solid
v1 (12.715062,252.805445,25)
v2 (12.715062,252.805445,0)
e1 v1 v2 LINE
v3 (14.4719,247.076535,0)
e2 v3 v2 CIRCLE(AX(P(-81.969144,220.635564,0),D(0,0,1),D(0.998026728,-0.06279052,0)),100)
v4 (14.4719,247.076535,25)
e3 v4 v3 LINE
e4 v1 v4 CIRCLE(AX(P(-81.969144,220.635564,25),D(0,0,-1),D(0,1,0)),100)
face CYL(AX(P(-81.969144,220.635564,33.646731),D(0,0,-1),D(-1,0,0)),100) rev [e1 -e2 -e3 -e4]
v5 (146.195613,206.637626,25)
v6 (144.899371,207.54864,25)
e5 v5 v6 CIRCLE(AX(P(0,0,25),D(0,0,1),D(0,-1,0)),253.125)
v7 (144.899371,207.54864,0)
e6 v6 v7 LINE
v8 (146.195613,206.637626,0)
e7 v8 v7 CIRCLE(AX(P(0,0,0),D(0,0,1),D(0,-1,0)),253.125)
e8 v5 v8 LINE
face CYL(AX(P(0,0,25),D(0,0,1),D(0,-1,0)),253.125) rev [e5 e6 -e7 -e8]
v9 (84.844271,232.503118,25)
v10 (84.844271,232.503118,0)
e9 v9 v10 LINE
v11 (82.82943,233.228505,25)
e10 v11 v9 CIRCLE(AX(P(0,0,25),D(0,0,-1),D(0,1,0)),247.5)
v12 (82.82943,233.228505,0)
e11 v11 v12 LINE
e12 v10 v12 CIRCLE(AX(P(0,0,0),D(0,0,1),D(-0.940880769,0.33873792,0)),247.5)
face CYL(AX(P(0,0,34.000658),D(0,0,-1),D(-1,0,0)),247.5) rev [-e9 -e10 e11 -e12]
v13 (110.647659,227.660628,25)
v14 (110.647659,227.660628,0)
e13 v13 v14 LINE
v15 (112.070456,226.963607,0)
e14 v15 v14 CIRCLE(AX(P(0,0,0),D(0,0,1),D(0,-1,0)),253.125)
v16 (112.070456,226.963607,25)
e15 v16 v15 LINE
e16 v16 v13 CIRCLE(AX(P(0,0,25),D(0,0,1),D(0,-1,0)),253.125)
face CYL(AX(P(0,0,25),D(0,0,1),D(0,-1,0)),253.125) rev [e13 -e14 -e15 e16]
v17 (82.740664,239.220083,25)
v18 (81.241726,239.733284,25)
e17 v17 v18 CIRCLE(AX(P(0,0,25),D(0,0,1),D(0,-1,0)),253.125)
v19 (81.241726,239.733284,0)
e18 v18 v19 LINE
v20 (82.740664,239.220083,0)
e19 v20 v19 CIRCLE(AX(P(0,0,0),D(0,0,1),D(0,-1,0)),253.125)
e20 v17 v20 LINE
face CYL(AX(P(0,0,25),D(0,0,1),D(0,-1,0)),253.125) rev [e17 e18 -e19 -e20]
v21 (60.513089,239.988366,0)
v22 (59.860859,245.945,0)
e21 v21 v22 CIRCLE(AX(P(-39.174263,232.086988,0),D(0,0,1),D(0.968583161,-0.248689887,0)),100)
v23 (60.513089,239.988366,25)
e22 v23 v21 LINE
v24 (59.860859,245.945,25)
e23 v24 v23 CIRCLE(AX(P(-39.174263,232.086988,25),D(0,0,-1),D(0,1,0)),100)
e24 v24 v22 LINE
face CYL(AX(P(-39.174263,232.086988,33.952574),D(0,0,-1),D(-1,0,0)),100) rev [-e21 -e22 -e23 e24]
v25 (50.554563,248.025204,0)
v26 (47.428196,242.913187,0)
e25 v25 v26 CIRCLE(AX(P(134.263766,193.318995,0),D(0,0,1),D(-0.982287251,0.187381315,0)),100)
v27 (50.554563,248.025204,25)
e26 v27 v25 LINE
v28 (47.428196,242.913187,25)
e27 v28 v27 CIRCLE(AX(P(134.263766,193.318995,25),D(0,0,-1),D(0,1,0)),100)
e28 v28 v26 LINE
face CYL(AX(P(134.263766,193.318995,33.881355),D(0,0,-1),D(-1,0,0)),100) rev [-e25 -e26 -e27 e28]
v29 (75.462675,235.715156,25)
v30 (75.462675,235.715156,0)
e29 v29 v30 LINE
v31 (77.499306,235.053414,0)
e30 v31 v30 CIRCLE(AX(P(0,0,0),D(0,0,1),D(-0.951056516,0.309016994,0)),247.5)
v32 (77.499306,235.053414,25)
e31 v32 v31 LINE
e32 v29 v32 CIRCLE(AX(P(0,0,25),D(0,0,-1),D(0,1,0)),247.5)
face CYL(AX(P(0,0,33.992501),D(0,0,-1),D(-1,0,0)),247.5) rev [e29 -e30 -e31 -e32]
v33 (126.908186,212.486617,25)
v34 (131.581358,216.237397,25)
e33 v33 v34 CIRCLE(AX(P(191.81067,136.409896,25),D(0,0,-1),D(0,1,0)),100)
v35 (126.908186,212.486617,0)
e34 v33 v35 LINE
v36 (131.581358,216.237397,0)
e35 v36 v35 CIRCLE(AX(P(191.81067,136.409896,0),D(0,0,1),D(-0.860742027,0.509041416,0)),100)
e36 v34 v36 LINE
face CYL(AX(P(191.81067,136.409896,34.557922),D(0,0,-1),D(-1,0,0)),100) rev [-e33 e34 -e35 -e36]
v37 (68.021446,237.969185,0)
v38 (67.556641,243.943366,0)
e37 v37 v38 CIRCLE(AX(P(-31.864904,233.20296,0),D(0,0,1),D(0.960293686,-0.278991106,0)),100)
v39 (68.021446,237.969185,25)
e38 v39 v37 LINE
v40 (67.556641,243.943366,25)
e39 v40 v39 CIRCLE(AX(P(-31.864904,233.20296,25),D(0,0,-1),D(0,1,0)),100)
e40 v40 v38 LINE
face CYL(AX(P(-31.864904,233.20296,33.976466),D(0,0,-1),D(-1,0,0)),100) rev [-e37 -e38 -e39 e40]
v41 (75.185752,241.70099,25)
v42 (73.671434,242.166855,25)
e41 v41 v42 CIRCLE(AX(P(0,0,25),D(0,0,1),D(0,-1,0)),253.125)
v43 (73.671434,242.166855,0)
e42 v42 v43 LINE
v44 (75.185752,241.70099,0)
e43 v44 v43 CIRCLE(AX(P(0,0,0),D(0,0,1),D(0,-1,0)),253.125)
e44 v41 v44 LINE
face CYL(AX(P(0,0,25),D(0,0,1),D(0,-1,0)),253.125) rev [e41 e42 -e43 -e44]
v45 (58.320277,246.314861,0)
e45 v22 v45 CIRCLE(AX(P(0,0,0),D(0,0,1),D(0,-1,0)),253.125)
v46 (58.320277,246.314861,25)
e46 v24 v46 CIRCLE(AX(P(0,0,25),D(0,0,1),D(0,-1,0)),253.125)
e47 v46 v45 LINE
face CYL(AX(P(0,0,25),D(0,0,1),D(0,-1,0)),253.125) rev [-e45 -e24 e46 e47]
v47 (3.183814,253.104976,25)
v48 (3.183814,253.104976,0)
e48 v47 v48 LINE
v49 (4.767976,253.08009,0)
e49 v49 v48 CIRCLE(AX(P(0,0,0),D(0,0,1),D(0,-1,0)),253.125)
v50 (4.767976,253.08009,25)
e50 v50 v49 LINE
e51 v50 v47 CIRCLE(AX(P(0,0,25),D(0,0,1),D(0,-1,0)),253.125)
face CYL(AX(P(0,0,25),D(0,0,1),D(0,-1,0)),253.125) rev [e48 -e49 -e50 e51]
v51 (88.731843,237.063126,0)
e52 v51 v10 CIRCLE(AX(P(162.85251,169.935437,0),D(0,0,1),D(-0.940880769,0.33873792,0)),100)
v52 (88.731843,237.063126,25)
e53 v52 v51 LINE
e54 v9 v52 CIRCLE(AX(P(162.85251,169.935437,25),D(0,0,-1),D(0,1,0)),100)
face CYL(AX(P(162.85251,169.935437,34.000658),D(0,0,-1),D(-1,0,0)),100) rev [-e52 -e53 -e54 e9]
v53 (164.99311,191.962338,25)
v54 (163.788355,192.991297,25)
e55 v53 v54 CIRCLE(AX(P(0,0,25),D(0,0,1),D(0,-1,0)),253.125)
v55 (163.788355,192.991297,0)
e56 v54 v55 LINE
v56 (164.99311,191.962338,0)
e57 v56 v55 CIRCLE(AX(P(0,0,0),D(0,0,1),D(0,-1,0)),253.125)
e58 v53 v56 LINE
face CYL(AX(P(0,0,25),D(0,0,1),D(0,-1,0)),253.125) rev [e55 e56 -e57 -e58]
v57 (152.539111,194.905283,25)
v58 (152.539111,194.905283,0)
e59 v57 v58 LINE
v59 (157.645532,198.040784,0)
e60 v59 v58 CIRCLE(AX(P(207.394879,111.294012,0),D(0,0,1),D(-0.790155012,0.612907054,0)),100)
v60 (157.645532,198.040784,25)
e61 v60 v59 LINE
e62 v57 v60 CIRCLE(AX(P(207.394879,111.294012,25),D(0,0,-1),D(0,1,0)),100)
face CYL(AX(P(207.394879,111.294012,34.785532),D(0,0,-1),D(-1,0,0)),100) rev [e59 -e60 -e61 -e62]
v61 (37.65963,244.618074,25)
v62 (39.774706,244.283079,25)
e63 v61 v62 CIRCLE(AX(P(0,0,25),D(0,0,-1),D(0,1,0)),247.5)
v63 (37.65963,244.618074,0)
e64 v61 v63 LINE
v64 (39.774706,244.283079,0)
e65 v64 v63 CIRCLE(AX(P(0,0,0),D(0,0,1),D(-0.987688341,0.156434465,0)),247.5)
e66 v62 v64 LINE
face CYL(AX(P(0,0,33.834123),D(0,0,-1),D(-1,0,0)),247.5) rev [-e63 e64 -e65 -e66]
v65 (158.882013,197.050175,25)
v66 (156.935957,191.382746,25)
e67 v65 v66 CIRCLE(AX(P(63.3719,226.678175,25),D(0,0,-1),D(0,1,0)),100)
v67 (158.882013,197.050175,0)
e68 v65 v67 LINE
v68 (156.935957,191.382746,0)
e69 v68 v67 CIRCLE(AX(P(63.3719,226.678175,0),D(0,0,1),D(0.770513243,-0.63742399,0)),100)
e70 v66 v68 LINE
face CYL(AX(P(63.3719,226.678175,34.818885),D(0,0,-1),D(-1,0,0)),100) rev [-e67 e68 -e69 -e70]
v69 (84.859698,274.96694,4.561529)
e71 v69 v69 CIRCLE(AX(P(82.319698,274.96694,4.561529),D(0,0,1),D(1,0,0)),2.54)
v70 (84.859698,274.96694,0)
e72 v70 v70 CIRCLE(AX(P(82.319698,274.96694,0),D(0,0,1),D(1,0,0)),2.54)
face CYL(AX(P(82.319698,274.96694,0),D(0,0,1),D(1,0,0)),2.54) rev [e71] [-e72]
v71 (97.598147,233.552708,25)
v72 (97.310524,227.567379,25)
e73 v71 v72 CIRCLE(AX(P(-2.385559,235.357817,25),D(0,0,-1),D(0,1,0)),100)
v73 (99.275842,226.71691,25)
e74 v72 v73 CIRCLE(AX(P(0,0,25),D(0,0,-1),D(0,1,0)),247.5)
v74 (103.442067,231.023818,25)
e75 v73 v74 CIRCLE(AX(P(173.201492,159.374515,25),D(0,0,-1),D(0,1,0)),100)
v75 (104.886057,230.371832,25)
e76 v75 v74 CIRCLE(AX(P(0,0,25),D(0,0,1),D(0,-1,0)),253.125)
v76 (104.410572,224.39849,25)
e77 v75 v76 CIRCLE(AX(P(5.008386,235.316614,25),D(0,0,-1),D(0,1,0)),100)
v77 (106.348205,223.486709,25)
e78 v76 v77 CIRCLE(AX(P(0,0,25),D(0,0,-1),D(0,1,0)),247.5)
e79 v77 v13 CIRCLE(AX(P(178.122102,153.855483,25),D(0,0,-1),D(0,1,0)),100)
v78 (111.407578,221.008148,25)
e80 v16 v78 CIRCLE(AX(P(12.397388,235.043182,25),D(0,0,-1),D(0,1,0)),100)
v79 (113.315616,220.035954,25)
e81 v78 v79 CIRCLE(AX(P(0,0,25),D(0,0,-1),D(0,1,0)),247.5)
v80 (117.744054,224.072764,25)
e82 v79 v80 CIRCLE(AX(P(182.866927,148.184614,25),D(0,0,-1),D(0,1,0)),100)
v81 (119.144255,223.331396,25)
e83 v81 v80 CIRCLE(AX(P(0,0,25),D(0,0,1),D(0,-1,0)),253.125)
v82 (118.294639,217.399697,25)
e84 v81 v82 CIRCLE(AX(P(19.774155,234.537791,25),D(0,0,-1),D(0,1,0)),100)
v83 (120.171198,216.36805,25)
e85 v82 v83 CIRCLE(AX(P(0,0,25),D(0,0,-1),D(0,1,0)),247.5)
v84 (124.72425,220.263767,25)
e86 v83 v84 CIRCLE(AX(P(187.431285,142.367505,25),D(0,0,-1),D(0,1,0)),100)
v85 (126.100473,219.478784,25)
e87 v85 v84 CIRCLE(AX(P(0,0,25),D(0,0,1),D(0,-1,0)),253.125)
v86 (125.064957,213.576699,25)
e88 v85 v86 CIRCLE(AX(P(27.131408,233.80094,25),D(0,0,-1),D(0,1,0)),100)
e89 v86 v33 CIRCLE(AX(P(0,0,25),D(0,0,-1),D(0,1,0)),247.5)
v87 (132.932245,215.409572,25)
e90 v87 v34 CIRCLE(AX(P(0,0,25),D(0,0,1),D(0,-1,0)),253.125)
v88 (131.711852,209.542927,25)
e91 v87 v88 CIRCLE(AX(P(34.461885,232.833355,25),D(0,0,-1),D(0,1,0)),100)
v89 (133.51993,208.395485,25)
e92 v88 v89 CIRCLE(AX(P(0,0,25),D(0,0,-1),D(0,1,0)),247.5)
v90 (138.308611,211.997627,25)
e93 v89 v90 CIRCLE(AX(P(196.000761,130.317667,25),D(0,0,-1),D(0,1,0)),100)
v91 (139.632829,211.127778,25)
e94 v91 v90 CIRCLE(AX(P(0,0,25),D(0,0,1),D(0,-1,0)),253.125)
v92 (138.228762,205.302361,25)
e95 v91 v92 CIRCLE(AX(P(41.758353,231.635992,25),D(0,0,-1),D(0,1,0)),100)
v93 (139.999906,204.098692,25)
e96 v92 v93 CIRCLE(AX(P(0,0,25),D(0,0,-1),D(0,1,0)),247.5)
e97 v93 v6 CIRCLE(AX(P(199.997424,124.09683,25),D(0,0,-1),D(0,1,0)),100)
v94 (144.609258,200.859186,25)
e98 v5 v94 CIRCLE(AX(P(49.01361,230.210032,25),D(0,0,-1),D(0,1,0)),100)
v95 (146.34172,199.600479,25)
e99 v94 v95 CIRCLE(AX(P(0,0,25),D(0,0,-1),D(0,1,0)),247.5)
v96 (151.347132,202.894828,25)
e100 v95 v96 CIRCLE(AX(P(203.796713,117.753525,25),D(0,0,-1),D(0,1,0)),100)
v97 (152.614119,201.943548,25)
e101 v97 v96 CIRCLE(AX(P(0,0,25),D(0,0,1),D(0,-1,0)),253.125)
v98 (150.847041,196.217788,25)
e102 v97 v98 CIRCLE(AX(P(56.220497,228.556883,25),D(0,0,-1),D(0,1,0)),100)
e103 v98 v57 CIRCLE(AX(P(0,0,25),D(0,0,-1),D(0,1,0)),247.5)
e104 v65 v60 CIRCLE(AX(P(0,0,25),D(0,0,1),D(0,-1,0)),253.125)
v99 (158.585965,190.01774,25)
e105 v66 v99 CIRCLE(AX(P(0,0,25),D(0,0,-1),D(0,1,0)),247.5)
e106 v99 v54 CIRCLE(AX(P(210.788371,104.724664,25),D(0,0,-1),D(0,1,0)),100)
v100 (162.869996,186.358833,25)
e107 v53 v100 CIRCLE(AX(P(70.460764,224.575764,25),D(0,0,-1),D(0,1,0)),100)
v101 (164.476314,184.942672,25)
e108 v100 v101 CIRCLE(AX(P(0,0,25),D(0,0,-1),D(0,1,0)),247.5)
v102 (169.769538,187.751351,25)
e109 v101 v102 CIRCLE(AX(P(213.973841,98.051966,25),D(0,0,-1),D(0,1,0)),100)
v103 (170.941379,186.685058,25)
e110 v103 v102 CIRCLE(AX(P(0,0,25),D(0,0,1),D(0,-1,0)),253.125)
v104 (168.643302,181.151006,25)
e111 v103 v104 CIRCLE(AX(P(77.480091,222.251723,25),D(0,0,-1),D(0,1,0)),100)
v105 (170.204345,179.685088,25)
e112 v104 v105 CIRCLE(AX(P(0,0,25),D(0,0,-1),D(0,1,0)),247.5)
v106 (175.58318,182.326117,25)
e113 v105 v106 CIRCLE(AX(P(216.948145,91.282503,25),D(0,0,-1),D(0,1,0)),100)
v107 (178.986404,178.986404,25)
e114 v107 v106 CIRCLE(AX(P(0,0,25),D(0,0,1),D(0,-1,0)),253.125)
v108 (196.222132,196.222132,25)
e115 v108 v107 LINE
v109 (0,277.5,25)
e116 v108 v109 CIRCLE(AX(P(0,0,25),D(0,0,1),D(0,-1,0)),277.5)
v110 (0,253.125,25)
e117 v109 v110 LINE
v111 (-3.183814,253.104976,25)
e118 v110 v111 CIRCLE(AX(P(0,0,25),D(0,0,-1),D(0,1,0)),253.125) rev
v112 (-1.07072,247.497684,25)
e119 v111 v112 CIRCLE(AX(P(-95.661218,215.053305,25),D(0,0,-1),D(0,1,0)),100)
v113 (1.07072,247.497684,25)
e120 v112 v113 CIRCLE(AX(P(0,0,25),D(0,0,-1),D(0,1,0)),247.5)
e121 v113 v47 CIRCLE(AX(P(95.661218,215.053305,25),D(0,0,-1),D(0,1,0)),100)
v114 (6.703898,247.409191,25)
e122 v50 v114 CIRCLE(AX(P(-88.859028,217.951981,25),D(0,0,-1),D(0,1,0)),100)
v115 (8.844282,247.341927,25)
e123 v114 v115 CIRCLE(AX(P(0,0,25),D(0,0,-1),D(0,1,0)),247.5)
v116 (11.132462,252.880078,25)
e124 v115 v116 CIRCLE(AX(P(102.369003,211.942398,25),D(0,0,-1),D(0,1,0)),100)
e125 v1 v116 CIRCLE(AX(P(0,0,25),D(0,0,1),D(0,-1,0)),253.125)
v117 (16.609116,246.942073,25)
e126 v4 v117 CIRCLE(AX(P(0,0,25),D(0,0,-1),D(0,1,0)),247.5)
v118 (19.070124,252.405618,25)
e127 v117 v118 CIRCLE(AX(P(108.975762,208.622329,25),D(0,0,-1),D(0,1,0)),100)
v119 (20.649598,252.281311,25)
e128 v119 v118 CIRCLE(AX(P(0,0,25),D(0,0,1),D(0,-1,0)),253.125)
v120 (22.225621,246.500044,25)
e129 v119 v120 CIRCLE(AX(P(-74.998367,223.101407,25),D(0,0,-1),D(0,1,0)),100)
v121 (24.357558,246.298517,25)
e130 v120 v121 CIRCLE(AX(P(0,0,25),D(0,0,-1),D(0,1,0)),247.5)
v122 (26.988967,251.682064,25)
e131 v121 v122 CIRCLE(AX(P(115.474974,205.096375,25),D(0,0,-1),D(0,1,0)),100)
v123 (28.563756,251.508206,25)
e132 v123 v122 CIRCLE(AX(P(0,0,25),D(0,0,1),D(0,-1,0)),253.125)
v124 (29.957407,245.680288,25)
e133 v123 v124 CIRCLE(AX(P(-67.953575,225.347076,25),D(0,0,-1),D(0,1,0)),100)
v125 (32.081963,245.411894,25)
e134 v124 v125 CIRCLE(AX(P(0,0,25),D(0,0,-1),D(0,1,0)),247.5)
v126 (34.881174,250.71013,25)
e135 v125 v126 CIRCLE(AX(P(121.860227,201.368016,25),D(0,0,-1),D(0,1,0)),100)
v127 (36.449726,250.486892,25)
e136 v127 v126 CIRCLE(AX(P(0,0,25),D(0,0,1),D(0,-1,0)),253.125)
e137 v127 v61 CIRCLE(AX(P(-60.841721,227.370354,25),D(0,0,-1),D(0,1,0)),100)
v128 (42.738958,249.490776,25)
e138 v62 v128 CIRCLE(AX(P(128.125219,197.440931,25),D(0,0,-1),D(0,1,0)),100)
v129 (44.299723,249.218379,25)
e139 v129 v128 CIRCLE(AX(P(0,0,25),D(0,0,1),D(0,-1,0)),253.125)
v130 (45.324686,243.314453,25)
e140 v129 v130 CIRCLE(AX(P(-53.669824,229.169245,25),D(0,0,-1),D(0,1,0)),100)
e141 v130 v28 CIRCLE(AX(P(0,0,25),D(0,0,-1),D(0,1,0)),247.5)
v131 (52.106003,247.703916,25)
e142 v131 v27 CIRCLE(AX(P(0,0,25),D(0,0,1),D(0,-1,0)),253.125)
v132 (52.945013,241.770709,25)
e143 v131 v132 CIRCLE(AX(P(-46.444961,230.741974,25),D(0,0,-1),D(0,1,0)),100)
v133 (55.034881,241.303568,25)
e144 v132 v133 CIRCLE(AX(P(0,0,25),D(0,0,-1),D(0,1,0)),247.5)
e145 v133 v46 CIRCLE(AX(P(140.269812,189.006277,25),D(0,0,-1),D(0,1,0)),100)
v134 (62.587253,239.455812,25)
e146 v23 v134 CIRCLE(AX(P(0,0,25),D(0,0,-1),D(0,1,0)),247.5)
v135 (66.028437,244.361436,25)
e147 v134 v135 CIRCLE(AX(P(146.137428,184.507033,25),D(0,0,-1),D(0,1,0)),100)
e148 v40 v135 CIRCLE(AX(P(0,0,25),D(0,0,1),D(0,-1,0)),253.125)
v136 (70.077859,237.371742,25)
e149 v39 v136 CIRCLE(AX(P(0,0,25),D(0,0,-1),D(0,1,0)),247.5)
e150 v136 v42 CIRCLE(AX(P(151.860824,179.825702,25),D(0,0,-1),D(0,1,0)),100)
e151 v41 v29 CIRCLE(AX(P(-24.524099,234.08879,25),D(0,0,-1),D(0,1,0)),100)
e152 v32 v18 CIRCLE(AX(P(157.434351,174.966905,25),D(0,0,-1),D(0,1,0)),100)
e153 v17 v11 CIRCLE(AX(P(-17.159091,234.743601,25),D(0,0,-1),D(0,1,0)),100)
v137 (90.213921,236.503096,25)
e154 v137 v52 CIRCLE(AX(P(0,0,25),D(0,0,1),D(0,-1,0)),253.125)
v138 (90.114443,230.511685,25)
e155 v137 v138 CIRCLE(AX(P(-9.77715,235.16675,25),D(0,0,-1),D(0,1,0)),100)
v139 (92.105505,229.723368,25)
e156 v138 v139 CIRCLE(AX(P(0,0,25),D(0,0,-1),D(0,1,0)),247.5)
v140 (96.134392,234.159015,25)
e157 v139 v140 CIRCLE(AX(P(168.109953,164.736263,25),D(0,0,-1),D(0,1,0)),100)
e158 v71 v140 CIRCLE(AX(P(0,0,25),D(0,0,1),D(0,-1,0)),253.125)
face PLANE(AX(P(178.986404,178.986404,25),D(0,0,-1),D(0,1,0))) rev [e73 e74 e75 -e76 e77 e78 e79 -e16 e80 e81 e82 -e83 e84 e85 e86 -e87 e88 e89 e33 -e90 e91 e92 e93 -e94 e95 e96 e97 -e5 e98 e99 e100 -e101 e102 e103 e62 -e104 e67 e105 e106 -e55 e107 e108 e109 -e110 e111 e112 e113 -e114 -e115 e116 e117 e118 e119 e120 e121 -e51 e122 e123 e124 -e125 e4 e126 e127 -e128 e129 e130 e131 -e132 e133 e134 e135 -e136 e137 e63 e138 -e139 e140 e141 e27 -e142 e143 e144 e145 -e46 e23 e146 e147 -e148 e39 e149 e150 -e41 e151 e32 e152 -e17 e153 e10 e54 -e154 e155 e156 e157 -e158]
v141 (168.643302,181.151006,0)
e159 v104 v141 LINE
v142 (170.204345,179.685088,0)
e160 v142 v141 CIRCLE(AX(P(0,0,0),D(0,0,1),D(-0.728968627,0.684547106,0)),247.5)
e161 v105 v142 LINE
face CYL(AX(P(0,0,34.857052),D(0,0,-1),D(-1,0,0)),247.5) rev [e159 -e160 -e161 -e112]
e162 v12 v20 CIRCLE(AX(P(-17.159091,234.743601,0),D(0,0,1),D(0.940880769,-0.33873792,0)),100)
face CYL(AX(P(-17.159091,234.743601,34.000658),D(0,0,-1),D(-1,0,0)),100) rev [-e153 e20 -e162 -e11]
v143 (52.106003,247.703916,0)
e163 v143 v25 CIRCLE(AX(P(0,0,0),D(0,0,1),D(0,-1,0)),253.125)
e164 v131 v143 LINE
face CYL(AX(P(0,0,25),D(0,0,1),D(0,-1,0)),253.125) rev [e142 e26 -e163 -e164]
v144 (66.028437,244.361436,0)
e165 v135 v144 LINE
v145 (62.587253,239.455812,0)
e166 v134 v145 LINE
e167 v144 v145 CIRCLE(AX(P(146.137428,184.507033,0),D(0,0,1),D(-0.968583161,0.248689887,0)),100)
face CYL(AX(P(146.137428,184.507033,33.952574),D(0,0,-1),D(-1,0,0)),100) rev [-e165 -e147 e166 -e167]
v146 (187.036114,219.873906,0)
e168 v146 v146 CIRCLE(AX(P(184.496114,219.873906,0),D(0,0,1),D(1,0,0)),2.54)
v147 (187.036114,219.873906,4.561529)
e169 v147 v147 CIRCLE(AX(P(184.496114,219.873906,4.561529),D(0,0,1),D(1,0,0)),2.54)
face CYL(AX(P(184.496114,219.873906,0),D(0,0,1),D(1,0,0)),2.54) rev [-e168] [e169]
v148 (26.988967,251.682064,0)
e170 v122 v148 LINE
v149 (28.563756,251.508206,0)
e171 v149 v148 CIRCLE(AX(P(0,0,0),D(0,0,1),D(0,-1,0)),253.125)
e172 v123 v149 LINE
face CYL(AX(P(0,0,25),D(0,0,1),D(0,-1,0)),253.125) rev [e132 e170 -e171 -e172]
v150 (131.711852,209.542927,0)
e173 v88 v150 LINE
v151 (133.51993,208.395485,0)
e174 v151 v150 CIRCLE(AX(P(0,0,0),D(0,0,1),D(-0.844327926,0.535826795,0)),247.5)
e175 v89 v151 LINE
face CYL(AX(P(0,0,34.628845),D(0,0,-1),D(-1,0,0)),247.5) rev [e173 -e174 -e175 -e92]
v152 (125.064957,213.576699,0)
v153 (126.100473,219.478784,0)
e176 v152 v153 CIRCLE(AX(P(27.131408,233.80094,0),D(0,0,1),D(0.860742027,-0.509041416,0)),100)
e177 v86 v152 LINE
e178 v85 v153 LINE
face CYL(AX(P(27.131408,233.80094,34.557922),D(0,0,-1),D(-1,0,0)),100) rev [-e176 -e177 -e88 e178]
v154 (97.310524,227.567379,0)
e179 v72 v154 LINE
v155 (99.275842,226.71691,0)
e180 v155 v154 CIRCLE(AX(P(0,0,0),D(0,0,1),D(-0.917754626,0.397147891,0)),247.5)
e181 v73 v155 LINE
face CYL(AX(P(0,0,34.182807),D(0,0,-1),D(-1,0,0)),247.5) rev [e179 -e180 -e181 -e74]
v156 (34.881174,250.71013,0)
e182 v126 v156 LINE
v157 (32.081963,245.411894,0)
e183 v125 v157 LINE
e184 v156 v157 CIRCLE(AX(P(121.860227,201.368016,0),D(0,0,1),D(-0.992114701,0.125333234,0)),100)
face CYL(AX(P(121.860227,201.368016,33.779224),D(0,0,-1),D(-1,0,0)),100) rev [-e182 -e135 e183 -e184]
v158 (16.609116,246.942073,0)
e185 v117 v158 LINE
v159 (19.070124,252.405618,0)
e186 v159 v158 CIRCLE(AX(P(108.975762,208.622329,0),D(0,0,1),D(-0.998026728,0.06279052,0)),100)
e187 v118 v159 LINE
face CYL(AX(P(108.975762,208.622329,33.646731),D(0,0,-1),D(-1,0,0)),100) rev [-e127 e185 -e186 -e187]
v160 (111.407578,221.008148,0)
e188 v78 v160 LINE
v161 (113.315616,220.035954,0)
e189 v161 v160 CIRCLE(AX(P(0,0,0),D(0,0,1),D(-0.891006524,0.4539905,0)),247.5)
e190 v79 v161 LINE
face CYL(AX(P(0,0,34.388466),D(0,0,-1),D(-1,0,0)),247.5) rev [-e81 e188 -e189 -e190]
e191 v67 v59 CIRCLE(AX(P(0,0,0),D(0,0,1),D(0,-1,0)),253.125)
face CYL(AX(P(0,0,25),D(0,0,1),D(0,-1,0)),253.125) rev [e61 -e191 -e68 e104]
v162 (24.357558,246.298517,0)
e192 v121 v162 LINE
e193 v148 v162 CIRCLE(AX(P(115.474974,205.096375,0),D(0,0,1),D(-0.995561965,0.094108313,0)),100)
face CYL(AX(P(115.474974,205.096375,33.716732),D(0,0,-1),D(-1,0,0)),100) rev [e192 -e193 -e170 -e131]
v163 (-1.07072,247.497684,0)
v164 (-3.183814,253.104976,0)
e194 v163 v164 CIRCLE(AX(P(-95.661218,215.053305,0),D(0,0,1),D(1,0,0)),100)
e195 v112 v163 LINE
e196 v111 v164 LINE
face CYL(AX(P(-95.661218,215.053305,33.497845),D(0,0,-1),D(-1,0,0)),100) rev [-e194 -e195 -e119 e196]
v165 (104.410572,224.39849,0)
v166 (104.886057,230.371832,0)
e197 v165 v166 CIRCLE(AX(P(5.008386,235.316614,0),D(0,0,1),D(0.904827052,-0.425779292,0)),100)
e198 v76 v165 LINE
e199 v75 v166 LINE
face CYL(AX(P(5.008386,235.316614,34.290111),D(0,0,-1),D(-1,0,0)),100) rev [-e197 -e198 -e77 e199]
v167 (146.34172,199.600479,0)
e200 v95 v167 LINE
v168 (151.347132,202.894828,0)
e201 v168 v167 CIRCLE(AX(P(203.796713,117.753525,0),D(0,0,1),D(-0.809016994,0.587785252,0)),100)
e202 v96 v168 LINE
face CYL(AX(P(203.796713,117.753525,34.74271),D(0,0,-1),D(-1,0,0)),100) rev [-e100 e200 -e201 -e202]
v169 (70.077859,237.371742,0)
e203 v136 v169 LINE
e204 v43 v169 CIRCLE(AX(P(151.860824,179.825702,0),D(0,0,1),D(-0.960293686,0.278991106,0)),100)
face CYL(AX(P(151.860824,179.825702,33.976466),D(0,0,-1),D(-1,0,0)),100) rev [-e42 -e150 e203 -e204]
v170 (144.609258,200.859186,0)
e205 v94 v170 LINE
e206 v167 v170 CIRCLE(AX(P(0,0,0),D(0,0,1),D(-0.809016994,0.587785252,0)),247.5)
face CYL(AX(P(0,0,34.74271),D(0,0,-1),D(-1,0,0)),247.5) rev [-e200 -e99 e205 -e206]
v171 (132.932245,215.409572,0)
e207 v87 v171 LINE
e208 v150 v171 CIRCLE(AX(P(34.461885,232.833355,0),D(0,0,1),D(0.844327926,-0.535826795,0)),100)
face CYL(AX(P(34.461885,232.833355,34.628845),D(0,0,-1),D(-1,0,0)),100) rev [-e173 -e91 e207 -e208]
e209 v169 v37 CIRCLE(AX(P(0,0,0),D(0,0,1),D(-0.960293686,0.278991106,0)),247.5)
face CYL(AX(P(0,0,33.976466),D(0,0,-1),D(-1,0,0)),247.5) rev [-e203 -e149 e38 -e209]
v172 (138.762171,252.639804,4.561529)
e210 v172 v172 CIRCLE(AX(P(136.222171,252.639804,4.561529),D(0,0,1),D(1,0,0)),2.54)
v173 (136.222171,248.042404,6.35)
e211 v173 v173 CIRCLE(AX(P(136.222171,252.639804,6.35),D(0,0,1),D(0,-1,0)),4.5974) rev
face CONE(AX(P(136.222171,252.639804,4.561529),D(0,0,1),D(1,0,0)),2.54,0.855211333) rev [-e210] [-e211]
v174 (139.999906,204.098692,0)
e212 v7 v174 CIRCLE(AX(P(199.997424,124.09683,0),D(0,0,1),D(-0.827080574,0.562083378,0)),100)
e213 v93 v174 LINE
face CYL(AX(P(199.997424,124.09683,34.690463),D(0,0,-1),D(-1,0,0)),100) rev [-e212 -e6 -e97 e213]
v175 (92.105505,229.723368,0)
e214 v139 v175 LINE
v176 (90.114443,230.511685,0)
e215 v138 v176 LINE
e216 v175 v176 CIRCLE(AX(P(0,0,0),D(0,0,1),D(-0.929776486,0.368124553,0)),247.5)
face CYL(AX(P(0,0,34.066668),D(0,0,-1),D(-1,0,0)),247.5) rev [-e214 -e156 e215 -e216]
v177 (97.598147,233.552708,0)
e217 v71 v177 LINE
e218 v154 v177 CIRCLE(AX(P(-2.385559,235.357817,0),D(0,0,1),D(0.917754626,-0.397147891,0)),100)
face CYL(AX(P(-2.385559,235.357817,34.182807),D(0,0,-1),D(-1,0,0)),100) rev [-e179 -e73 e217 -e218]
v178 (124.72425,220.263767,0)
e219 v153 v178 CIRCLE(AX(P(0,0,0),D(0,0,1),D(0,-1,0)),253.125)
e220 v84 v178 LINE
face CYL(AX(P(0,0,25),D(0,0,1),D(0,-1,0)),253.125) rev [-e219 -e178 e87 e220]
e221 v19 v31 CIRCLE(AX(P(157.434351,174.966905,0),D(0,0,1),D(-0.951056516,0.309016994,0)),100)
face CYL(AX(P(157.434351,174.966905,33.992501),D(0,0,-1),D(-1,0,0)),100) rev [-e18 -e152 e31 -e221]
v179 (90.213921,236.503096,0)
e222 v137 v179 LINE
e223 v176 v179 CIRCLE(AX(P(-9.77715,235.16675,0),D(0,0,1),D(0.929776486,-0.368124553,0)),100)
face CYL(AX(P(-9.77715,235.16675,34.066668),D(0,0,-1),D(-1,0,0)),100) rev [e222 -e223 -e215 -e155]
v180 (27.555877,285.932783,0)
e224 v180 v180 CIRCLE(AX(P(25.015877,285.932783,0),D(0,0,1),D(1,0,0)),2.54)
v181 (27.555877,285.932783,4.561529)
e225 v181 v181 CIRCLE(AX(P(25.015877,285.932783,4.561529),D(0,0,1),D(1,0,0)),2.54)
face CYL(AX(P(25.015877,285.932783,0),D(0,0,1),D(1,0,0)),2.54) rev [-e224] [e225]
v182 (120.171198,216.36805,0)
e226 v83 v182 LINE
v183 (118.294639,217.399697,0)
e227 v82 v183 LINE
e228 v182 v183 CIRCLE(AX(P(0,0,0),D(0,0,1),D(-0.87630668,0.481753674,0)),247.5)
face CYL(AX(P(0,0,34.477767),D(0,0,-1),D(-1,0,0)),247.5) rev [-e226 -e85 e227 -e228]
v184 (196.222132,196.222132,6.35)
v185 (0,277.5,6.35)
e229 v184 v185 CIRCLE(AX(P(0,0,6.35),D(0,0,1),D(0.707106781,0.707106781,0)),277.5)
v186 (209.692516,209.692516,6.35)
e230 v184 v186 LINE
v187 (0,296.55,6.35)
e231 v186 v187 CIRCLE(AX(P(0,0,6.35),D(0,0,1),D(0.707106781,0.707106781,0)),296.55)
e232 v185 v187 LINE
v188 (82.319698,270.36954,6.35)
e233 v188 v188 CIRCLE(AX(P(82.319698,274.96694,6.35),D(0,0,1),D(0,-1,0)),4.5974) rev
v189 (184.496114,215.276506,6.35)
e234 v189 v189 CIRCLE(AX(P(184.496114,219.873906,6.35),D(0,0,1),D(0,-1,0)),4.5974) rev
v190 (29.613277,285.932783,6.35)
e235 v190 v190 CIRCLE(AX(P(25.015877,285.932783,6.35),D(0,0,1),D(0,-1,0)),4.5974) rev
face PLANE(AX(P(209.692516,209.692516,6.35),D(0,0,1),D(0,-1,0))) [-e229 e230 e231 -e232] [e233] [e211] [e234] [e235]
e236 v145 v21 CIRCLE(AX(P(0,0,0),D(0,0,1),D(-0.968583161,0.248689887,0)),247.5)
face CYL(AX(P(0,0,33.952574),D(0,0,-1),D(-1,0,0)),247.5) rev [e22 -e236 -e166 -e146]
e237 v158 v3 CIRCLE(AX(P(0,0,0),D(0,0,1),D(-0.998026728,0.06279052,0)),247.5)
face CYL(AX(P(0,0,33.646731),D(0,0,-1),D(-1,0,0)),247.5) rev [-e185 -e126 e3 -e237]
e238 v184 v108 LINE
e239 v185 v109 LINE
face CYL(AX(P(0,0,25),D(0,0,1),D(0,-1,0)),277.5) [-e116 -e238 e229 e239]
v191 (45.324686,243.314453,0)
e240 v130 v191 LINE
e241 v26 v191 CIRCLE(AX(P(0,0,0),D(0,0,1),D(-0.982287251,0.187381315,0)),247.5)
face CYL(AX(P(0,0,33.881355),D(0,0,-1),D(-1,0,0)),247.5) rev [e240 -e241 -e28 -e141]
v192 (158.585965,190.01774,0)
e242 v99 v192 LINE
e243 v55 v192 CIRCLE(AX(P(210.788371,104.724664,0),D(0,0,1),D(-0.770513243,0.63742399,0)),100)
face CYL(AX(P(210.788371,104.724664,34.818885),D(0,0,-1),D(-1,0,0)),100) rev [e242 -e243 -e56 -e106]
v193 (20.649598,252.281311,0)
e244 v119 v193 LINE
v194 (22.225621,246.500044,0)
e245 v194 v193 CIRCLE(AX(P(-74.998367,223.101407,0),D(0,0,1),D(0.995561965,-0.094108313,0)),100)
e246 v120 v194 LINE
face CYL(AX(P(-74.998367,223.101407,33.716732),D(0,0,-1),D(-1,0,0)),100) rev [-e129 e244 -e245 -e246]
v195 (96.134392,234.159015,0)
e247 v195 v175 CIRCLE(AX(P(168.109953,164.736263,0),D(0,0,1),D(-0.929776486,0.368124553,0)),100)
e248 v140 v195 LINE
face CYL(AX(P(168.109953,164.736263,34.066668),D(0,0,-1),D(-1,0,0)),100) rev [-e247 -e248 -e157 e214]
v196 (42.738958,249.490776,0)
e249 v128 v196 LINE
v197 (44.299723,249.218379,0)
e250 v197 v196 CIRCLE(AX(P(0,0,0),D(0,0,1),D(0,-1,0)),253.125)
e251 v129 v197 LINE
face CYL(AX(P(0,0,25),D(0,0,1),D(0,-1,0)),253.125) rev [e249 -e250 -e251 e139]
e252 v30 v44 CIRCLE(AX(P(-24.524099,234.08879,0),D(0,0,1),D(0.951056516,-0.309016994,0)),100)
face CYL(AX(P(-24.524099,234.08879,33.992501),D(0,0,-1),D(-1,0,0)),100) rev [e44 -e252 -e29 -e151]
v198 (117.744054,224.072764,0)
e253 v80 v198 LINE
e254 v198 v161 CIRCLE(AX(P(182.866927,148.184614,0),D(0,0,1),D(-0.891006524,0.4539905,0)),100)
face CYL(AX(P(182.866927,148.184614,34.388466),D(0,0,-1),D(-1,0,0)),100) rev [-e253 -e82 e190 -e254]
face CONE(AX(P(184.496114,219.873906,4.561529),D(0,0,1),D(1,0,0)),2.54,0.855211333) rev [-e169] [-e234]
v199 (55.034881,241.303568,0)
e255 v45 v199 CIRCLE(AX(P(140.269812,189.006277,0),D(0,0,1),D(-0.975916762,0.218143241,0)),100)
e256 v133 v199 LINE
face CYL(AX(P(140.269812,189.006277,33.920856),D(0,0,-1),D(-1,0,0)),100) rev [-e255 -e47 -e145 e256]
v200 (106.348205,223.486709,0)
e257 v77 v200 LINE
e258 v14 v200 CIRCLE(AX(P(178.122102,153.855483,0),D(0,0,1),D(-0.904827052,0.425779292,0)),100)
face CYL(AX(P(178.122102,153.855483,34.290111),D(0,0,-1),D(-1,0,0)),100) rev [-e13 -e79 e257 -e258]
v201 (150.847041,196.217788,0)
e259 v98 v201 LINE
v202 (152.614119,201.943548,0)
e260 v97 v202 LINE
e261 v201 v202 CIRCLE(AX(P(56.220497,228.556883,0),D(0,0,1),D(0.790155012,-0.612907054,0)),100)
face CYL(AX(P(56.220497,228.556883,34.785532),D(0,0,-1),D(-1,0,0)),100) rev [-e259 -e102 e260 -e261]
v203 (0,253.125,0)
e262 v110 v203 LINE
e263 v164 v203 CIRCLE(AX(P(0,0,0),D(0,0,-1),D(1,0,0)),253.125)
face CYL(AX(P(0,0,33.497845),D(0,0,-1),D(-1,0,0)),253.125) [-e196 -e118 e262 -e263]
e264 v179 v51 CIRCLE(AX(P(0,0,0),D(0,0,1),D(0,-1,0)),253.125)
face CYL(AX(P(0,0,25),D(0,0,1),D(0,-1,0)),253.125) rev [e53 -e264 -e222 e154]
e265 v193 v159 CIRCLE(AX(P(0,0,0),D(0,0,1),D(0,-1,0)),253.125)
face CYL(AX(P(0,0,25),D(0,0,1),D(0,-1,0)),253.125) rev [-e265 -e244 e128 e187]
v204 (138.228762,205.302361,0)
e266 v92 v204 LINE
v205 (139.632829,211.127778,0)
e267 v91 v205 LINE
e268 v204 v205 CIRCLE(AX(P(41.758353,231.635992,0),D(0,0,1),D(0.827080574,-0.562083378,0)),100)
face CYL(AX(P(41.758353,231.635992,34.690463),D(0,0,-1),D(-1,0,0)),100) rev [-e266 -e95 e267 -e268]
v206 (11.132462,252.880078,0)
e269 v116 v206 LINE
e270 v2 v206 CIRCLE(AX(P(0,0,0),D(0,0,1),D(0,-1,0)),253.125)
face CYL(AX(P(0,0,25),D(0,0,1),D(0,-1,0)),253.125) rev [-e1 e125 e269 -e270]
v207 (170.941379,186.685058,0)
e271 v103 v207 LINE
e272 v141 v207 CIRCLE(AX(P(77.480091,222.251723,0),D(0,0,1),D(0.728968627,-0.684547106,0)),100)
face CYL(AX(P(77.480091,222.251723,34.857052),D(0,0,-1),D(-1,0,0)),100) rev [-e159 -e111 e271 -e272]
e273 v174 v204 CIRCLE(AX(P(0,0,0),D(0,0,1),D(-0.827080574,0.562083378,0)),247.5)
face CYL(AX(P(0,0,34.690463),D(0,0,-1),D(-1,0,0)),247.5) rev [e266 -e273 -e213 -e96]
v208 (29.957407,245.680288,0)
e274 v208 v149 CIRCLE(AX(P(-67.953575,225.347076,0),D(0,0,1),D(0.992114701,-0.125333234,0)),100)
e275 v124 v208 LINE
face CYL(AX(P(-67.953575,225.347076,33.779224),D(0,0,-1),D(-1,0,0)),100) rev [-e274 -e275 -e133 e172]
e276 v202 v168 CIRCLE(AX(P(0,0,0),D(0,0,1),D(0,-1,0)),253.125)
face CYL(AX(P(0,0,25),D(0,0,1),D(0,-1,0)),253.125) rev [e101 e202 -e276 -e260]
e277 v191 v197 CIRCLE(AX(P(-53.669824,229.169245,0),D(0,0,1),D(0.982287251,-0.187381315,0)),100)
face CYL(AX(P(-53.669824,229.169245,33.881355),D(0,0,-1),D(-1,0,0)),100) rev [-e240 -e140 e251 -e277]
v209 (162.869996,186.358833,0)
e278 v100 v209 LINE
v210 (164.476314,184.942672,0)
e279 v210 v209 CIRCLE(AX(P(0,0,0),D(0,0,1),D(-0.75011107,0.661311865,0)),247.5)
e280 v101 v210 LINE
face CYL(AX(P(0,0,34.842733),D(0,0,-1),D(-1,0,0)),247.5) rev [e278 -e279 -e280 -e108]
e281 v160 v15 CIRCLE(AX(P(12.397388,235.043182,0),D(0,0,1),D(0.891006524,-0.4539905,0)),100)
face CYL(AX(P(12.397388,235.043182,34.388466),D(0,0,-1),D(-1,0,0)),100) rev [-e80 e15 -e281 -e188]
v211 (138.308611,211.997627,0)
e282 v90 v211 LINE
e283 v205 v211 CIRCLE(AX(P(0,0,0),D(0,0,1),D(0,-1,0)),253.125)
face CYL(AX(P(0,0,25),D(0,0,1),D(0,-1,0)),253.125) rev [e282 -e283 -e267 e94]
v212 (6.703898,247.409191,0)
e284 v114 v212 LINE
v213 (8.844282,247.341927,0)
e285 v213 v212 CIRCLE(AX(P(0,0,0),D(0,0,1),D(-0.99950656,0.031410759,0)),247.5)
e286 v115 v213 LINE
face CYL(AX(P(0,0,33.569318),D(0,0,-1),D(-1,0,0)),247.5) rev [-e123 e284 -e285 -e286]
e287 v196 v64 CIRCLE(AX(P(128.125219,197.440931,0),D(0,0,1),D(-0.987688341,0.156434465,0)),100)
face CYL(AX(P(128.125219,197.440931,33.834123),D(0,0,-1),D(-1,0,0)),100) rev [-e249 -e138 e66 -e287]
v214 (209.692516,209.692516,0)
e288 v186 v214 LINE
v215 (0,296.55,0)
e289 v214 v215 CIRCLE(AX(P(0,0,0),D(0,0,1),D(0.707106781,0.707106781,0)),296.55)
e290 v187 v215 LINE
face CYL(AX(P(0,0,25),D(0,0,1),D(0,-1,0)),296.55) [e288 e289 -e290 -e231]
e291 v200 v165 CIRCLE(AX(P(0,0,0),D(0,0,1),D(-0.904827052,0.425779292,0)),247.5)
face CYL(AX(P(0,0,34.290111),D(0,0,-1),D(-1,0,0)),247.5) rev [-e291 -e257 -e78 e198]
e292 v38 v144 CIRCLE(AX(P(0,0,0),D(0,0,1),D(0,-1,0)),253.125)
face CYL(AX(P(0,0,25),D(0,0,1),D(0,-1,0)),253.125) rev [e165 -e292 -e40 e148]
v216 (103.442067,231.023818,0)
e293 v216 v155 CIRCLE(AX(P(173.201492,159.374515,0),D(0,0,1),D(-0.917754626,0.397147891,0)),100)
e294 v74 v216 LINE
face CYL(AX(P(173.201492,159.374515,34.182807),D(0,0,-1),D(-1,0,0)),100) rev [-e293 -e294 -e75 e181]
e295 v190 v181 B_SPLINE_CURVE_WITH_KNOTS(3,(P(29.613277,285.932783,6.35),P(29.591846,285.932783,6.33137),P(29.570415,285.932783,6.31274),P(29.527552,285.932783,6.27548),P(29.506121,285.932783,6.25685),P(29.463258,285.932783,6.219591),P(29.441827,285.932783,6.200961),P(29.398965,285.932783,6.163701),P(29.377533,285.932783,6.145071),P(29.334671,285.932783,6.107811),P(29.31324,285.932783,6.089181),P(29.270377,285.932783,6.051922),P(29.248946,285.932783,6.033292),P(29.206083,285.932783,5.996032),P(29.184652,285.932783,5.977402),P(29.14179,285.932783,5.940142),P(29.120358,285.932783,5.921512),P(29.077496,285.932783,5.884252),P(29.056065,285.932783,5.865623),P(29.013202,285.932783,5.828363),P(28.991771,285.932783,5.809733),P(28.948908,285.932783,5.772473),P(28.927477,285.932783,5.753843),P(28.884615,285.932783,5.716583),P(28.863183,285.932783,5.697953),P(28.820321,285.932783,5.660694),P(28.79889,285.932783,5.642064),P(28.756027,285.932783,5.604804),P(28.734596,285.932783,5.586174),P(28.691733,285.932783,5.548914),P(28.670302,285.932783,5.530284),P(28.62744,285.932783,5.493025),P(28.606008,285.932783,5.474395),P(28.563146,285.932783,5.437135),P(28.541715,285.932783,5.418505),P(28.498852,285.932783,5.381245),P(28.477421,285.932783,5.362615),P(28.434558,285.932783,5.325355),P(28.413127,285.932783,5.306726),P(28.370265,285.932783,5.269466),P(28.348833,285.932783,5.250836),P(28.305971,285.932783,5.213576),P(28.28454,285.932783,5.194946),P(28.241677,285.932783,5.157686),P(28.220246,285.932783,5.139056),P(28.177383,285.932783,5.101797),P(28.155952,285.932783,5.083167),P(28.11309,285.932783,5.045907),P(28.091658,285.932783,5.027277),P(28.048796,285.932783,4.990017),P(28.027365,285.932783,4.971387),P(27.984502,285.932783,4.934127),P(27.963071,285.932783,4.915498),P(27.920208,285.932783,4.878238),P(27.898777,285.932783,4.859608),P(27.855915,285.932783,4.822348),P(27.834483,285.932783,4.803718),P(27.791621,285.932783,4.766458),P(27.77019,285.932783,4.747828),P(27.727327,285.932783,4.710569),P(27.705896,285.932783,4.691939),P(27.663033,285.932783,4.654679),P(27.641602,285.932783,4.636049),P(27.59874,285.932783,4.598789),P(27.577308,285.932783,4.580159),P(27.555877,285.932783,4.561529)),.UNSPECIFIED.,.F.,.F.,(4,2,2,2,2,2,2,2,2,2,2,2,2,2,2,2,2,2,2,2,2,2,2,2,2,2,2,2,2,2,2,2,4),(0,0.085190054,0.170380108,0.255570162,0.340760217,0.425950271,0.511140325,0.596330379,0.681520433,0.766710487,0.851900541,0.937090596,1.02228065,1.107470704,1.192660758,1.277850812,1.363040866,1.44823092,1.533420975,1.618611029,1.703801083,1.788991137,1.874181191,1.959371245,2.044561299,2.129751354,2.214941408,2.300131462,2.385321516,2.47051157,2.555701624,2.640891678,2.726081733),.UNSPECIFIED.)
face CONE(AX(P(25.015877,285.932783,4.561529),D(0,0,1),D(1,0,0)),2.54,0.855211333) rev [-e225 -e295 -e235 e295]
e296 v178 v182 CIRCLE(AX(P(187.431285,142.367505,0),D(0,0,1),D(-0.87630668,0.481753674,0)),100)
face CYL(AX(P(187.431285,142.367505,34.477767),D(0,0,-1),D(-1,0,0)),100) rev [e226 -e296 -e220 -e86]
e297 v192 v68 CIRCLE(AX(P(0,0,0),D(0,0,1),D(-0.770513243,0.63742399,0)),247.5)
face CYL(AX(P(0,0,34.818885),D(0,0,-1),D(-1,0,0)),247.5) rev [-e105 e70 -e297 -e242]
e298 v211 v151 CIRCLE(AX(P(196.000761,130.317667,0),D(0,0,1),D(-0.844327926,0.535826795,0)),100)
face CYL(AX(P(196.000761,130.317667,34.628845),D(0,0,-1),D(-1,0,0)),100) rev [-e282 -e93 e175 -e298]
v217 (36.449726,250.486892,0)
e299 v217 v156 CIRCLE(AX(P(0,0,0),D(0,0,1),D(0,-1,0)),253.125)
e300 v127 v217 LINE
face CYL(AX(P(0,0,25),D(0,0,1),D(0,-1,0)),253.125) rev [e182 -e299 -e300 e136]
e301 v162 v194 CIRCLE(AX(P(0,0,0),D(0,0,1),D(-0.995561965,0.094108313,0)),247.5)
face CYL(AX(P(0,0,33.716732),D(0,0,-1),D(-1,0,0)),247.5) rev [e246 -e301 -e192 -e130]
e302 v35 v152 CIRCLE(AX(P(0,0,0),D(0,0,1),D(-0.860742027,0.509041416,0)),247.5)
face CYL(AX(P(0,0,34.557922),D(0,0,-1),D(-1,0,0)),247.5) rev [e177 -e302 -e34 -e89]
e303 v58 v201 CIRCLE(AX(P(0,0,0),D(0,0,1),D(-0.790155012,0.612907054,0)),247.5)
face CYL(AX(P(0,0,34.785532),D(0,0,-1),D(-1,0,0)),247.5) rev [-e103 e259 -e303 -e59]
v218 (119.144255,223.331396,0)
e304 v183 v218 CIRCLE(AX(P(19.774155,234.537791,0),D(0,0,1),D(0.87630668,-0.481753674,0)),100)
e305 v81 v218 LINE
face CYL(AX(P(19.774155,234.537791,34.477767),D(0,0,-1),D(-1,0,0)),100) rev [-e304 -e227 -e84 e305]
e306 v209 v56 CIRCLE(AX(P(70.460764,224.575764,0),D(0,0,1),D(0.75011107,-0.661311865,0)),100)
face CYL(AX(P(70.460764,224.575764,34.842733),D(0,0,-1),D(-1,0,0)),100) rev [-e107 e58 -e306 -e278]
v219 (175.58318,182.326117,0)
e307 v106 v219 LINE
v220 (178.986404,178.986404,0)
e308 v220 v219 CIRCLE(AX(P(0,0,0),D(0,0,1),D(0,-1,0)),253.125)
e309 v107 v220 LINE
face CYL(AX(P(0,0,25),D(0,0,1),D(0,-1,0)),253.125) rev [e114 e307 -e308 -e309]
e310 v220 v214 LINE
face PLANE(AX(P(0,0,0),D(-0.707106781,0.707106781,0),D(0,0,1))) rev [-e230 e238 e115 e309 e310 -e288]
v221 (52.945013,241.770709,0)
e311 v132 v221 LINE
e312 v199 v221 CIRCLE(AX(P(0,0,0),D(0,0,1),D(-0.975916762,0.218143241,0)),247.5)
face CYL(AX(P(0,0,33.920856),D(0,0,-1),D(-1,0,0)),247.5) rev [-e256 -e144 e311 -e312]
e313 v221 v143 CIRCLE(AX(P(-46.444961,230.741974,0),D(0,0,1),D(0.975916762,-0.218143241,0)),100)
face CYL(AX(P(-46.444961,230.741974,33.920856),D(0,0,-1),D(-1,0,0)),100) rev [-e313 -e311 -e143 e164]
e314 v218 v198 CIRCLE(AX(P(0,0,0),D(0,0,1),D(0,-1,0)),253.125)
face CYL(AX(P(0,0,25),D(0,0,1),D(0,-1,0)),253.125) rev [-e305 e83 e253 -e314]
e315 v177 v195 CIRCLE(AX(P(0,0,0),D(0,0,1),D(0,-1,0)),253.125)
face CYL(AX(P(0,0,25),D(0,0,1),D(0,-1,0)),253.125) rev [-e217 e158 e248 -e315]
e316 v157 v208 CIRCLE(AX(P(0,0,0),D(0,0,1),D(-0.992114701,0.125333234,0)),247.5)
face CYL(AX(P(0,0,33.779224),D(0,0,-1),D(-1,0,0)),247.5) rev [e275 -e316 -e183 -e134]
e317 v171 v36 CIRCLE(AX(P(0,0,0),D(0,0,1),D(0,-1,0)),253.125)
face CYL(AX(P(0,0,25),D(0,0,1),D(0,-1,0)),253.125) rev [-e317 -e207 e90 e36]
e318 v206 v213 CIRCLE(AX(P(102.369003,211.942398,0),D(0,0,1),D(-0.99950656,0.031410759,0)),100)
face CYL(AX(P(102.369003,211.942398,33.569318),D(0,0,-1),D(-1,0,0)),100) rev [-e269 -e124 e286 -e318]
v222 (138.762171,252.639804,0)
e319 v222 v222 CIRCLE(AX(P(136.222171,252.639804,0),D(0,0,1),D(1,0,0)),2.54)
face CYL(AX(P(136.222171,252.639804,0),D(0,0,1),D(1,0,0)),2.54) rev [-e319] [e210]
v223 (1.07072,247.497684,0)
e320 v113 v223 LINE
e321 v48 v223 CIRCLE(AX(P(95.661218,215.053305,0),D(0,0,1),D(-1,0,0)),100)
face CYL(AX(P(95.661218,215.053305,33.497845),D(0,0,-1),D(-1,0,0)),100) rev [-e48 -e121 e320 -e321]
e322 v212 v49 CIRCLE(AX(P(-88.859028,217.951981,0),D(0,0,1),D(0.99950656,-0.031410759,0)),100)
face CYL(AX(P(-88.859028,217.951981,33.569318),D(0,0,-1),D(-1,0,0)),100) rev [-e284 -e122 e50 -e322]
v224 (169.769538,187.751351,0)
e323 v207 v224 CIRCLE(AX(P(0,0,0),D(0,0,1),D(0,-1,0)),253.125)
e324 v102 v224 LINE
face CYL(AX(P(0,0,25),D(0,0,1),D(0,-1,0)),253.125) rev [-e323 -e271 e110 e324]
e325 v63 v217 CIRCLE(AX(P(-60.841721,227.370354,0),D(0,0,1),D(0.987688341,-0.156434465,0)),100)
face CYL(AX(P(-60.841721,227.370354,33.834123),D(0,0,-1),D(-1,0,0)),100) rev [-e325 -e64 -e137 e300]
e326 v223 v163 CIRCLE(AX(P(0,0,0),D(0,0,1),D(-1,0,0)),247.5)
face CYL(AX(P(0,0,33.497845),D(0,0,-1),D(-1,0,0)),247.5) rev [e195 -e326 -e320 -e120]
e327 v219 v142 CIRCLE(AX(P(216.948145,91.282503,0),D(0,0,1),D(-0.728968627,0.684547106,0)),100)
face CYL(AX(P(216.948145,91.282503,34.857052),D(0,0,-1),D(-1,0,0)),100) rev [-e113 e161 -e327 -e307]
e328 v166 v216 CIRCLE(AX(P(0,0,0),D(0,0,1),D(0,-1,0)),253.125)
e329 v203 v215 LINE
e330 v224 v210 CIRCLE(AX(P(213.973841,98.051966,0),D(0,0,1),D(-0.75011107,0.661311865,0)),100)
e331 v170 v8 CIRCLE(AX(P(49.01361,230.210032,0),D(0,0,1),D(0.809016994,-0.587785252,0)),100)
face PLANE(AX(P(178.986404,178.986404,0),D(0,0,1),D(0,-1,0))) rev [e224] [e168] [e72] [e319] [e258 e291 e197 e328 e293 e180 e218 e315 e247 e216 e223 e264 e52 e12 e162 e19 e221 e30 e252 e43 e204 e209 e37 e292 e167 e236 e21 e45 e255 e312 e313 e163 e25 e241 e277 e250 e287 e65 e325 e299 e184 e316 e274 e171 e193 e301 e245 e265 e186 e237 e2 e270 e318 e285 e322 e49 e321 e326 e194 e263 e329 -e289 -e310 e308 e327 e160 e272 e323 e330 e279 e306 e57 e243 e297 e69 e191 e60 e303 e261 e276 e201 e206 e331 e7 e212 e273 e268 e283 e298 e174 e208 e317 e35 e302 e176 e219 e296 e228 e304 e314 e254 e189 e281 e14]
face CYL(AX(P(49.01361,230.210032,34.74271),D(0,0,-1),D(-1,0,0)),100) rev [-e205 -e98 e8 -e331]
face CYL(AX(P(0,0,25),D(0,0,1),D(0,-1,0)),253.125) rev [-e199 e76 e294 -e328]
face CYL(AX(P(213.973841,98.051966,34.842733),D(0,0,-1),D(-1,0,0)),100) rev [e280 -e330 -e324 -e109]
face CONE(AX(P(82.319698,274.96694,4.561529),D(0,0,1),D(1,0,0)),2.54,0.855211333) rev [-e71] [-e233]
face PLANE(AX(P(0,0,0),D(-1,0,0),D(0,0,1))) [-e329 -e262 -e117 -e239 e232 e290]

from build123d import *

# Parameters (mm, degrees)
SKETCH4_W           = 25
SKETCH4_H           = 24.37499982
REVOLVE1_ANGLE      = 45
BOSS_EXTRUDE1_DEPTH = 25
CIRPATTERN1_COUNT   = 25
CIRPATTERN1_ANGLE   = 43.2
SWEEP1_DEPTH        = 6.35
SKETCH18_R          = 2.54
CUT_EXTRUDE1_DEPTH  = 364.676609435
CHAMFER1_SIZE       = 2.0574
CHAMFER1_SIZE2      = 1.788470534


# Read off the part's stored shape, not the designer's step: Sweep1
with BuildPart() as part:
    # Sketch4 → Revolve1 (revolve)
    with BuildSketch(Plane(origin=(0, 0, 0), x_dir=(0, 0, -1), z_dir=(1, 0, 0))):
        with Locations((-12.5, 265.31250009)):
            Rectangle(SKETCH4_W, SKETCH4_H)
    revolve(axis=Axis((0, 0, 25), (0, 0, -1)), revolution_arc=REVOLVE1_ANGLE)

    # Sketch16 → Boss-Extrude1 (add)
    with BuildSketch(Plane(origin=(0, 0, 0), x_dir=(-1, 0, 0), z_dir=(0, 0, -1))):
        with BuildLine():
            ThreePointArc((-3.183813967, 253.104976333), (0, 253.12500018), (3.183813967, 253.104976333))
            ThreePointArc((3.183813967, 253.104976333), (2.085257529, 250.317161386), (1.070720498, 247.497683944))
            ThreePointArc((1.070720498, 247.497683944), (0, 247.5), (-1.070720498, 247.497683944))
            ThreePointArc((-1.070720498, 247.497683944), (-2.085257529, 250.317161386), (-3.183813967, 253.104976333))
        make_face()
    boss_extrude1 = extrude(amount=-BOSS_EXTRUDE1_DEPTH)

    # CirPattern1: Boss-Extrude1 ×25 about axis
    cirpattern1_axis = Axis((0, 0, 0), (0, 0, -1))
    for i in range(1, CIRPATTERN1_COUNT):
        add(boss_extrude1.rotate(cirpattern1_axis, i * CIRPATTERN1_ANGLE / (CIRPATTERN1_COUNT - 1)))

    # Sweep1 outline → Sweep1 (add)
    with BuildSketch(Plane.XY):
        with BuildLine():
            Line((196.222131779, 196.222131779), (209.692515961, 209.692515961))
            ThreePointArc((209.692515961, 209.692515961), (113.484771868, 273.976475366), (0, 296.55))
            Line((0, 296.55), (0, 277.5))
            ThreePointArc((0, 277.5), (106.194652481, 256.376570272), (196.222131779, 196.222131779))
        make_face()
    extrude(amount=SWEEP1_DEPTH)

    # Sketch18 → Cut-Extrude1 (cut, through all)
    with BuildSketch(Plane.XY.offset(6.35)):
        with Locations((25.015877062, 285.93278322)):
            Circle(SKETCH18_R)
        with Locations((82.319697869, 274.966939772)):
            Circle(SKETCH18_R)
        with Locations((136.222171127, 252.639804303)):
            Circle(SKETCH18_R)
        with Locations((184.49611367, 219.873906286)):
            Circle(SKETCH18_R)
    extrude(amount=-CUT_EXTRUDE1_DEPTH, mode=Mode.SUBTRACT)

    # Chamfer1
    chamfer1_edges = [part.edges().sort_by_distance(p)[0] for p in [
        (22.475877062, 285.93278322, 6.35),
        (79.779697869, 274.966939772, 6.35),
        (133.682171127, 252.639804303, 6.35),
        (181.95611367, 219.873906286, 6.35),
    ]]
    chamfer1_side = [part.faces().sort_by_distance(p)[0] for p in [
        (107.078815813, 258.511129376, 6.35),
    ]]
    chamfer(chamfer1_edges, length=CHAMFER1_SIZE, length2=CHAMFER1_SIZE2, reference=chamfer1_side[0])


solid = part.part
